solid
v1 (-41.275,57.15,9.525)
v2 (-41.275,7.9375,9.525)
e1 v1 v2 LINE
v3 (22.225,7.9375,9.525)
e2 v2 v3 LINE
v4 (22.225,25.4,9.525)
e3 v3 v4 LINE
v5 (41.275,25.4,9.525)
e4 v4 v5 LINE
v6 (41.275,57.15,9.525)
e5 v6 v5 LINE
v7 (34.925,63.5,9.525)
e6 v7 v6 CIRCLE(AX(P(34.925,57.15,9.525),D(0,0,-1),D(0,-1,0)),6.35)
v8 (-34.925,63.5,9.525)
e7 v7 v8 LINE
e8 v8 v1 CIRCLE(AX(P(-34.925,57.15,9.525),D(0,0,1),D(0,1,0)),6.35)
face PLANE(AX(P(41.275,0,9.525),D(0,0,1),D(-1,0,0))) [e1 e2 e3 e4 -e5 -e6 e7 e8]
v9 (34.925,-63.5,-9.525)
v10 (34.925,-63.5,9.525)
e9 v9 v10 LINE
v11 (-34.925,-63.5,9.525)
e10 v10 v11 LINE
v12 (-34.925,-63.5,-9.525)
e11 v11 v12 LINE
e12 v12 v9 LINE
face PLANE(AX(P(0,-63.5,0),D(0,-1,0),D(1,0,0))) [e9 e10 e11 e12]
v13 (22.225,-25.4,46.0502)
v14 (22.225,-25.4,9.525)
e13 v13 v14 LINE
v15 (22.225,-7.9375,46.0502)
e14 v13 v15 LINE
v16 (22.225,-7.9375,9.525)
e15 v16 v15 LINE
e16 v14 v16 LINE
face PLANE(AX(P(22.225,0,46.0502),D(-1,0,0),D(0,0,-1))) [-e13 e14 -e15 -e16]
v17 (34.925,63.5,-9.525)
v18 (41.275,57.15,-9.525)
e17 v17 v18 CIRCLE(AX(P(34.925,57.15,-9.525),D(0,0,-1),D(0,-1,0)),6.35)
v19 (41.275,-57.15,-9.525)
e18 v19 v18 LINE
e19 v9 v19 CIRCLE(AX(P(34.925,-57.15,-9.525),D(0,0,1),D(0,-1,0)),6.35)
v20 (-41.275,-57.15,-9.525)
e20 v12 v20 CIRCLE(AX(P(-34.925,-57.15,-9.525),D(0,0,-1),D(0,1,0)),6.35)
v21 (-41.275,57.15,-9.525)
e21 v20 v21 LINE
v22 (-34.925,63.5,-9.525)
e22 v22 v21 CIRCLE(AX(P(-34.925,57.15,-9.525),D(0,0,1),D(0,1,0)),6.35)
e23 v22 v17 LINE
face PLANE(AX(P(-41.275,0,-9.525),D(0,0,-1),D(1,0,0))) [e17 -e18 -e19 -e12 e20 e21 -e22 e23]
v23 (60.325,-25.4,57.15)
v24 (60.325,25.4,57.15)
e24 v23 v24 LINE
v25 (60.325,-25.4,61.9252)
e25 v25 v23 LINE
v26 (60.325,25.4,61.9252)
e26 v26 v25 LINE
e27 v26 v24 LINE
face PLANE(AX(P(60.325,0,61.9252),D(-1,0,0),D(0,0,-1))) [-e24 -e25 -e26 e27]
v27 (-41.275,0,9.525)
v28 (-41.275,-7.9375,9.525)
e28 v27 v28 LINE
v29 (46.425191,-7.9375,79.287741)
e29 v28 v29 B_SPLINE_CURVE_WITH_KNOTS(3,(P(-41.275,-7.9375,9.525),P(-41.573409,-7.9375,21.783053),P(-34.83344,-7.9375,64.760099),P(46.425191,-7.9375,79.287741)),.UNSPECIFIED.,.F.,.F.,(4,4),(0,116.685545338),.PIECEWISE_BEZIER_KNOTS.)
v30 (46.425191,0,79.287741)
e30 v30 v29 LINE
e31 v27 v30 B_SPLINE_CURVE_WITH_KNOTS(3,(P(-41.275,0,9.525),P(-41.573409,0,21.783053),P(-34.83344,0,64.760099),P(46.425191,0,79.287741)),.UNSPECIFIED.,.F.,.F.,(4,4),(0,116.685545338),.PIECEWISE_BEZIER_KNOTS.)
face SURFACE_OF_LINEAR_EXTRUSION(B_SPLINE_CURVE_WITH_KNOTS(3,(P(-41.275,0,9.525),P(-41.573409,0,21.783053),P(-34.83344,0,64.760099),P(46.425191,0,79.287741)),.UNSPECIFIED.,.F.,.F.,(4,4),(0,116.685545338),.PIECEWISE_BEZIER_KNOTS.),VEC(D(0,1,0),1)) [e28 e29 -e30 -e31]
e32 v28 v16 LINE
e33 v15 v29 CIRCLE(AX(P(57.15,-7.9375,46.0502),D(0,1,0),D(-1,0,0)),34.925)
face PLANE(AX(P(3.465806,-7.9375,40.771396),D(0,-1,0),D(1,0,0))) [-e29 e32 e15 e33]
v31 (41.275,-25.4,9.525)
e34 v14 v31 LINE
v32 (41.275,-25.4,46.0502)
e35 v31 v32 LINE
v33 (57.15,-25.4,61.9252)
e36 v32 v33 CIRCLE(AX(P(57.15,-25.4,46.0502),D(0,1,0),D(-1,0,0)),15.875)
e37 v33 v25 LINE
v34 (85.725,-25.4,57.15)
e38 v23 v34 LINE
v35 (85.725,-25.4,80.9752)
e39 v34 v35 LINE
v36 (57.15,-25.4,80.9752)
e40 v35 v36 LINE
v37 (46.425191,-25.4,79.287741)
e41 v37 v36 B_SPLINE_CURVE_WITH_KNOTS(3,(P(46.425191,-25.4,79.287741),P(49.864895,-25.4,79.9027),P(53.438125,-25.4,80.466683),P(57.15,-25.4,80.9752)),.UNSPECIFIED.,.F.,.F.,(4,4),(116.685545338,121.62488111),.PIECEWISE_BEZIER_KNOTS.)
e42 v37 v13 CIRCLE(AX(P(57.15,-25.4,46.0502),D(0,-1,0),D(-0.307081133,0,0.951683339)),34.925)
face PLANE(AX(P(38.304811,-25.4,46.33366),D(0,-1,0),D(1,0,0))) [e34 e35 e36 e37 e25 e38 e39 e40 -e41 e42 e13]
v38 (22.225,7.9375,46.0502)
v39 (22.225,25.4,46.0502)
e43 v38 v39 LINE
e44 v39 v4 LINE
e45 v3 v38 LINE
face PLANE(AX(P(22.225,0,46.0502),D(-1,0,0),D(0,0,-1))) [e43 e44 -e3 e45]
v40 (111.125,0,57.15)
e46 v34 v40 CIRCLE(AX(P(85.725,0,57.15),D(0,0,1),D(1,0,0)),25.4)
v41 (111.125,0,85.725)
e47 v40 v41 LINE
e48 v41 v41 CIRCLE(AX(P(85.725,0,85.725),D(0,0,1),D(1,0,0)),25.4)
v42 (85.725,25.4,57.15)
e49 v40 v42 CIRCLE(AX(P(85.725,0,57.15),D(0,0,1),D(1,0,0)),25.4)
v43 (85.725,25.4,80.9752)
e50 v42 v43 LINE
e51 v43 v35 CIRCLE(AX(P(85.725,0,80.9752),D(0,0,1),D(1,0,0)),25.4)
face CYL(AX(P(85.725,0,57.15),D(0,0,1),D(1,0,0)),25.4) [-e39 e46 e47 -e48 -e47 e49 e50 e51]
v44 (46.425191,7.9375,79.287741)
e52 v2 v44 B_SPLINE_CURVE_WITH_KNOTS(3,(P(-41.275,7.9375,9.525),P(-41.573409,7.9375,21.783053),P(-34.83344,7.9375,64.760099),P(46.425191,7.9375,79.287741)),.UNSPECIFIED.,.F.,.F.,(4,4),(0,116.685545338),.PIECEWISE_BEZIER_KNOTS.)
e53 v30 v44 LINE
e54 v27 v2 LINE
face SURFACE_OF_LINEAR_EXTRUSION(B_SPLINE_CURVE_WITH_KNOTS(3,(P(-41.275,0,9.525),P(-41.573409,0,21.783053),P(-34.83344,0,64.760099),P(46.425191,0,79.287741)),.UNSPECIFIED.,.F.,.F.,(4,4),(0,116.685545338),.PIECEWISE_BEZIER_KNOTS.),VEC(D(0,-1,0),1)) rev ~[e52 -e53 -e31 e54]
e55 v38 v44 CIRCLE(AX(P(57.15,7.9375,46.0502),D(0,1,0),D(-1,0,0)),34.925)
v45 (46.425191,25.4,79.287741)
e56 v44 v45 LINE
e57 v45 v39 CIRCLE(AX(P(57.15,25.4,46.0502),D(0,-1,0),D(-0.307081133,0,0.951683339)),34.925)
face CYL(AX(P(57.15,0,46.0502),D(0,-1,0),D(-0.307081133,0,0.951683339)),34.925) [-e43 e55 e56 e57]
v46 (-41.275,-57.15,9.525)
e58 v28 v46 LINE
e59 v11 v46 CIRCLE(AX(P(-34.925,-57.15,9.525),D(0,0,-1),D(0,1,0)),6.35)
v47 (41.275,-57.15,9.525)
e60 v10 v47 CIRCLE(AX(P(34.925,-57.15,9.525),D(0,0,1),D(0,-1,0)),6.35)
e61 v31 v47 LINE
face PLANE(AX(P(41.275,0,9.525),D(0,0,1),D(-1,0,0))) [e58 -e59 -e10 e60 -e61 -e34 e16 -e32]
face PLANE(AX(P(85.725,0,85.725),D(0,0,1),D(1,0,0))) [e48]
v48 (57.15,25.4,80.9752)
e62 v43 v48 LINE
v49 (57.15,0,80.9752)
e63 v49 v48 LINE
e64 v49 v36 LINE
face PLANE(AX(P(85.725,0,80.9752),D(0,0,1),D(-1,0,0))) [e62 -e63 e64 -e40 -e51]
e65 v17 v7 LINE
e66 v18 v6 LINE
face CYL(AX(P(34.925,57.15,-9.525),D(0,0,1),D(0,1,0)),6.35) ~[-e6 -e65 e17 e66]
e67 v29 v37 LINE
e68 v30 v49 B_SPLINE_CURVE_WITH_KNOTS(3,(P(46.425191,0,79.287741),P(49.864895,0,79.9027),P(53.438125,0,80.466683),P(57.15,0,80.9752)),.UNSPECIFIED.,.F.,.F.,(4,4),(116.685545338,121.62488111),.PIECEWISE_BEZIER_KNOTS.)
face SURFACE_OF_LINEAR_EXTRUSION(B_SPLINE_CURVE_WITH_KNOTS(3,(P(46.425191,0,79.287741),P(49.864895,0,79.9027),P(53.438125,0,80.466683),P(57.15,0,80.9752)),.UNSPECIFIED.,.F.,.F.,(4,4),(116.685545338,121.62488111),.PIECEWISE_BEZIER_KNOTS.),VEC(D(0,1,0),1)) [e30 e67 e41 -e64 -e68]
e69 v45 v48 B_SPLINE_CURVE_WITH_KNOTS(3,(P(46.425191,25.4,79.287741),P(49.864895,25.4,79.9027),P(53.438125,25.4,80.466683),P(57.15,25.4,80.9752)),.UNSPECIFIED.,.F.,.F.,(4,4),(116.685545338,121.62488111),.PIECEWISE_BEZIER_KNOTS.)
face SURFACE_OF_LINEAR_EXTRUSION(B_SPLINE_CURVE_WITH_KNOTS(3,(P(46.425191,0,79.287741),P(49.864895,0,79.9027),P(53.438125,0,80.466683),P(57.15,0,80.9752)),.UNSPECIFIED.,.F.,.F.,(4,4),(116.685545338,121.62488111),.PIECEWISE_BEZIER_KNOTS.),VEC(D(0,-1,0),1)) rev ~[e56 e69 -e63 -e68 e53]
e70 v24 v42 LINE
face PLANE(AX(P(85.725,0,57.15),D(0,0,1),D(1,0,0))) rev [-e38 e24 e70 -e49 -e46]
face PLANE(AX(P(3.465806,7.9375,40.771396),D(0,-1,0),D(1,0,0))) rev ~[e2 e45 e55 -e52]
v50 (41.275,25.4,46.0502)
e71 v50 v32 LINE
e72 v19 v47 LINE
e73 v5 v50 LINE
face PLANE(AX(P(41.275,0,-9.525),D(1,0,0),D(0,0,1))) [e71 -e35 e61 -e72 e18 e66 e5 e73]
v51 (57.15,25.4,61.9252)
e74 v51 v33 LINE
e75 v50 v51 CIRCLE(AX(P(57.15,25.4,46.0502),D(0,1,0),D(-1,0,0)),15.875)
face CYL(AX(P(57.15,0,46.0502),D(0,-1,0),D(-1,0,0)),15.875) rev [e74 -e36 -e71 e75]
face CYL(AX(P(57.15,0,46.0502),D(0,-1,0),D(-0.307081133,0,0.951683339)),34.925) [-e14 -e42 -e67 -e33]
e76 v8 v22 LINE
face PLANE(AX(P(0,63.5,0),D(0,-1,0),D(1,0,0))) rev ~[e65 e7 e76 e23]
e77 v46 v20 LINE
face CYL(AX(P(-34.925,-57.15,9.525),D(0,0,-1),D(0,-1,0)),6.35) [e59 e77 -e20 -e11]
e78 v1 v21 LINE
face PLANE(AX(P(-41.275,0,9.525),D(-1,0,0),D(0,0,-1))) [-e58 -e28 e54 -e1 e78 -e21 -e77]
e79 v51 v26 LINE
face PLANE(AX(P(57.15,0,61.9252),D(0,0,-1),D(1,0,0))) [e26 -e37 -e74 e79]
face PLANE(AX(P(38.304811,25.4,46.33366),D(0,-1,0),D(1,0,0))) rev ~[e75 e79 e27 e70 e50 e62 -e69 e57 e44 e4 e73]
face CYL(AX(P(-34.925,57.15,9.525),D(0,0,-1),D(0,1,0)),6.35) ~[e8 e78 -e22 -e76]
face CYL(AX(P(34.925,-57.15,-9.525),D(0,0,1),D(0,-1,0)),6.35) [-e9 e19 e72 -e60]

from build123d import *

# Parameters (mm, degrees)
F1_DEPTH = 63.5
F2_DEPTH = 25.4
F3_DEPTH = 7.9375
F5_R     = 6.35


# Not quite as in the source:
# - a feature names something its author has since deleted; it is built from what else it names


with BuildPart() as f1:
    # F0 (on Front) → F1 (new body, symmetric)
    with BuildSketch(Plane.XZ):
        Polygon((41.275, -9.525), (41.275, 9.525), (22.225, 9.525), (-41.275, 9.525), (-41.275, -9.525), align=None)
    extrude(amount=F1_DEPTH, both=True)

    # F0 (on Front) → F2 (join, symmetric)
    with BuildSketch(Plane.XZ):
        with BuildLine():
            Line((22.225, 9.525), (41.275, 9.525))
            Line((41.275, 9.525), (41.275, 46.0502))
            ThreePointArc((41.275, 46.0502), (45.9246798487, 57.2755201513), (57.15, 61.9252))
            Line((57.15, 61.9252), (60.325, 61.9252))
            Line((60.325, 61.9252), (60.325, 80.9752))
            Line((60.325, 80.9752), (57.15, 80.9752))
            add(Edge.make_bspline(
                [(46.42519144, 79.2877406183), (49.8648948299, 79.9027002695), (53.4381248944, 80.4666827005), (57.15, 80.9752)],
                knots=[116.6855453381, 116.6855453381, 116.6855453381, 116.6855453381, 121.6248811101, 121.6248811101, 121.6248811101, 121.6248811101], degree=3))
            ThreePointArc((46.42519144, 79.2877406183), (28.9159818308, 66.6073360608), (22.225, 46.0502))
            Line((22.225, 46.0502), (22.225, 9.525))
        make_face()
        Polygon((60.325, 80.9752), (60.325, 61.9252), (60.325, 57.15), (85.725, 57.15), (85.725, 80.9752), align=None)
    extrude(amount=F2_DEPTH, both=True)

    # F0 (on Front) → F3 (join, symmetric)
    with BuildSketch(Plane.XZ):
        with BuildLine():
            Line((-41.275, 9.525), (22.225, 9.525))
            Line((22.225, 9.525), (22.225, 46.0502))
            ThreePointArc((22.225, 46.0502), (28.9159818308, 66.6073360608), (46.42519144, 79.2877406183))
            add(Edge.make_bspline(
                [(-41.275, 9.525), (-41.5734088799, 21.7830526255), (-34.833440161, 64.760098527), (46.42519144, 79.2877406183)],
                knots=[0, 0, 0, 0, 116.6855453381, 116.6855453381, 116.6855453381, 116.6855453381], degree=3))
        make_face()
    extrude(amount=F3_DEPTH, both=True)

    # F0 (on Front) → F4 (revolve)
    with BuildSketch(Plane.XZ):
        Polygon((85.725, 80.9752), (85.725, 57.15), (111.125, 57.15), (111.125, 85.725), (85.725, 85.725), align=None)
    revolve(axis=Axis((85.725, 0, 71.4375), (0, 0, 1)))

    # F5
    f5_edges = [f1.edges().sort_by_distance(p)[0] for p in [
        (41.275, -63.5, 0),
        (-41.275, -63.5, 0),
        (-41.275, 63.5, 0),
        (41.275, 63.5, 0),
    ]]
    fillet(f5_edges, radius=F5_R)


solid = f1.part
